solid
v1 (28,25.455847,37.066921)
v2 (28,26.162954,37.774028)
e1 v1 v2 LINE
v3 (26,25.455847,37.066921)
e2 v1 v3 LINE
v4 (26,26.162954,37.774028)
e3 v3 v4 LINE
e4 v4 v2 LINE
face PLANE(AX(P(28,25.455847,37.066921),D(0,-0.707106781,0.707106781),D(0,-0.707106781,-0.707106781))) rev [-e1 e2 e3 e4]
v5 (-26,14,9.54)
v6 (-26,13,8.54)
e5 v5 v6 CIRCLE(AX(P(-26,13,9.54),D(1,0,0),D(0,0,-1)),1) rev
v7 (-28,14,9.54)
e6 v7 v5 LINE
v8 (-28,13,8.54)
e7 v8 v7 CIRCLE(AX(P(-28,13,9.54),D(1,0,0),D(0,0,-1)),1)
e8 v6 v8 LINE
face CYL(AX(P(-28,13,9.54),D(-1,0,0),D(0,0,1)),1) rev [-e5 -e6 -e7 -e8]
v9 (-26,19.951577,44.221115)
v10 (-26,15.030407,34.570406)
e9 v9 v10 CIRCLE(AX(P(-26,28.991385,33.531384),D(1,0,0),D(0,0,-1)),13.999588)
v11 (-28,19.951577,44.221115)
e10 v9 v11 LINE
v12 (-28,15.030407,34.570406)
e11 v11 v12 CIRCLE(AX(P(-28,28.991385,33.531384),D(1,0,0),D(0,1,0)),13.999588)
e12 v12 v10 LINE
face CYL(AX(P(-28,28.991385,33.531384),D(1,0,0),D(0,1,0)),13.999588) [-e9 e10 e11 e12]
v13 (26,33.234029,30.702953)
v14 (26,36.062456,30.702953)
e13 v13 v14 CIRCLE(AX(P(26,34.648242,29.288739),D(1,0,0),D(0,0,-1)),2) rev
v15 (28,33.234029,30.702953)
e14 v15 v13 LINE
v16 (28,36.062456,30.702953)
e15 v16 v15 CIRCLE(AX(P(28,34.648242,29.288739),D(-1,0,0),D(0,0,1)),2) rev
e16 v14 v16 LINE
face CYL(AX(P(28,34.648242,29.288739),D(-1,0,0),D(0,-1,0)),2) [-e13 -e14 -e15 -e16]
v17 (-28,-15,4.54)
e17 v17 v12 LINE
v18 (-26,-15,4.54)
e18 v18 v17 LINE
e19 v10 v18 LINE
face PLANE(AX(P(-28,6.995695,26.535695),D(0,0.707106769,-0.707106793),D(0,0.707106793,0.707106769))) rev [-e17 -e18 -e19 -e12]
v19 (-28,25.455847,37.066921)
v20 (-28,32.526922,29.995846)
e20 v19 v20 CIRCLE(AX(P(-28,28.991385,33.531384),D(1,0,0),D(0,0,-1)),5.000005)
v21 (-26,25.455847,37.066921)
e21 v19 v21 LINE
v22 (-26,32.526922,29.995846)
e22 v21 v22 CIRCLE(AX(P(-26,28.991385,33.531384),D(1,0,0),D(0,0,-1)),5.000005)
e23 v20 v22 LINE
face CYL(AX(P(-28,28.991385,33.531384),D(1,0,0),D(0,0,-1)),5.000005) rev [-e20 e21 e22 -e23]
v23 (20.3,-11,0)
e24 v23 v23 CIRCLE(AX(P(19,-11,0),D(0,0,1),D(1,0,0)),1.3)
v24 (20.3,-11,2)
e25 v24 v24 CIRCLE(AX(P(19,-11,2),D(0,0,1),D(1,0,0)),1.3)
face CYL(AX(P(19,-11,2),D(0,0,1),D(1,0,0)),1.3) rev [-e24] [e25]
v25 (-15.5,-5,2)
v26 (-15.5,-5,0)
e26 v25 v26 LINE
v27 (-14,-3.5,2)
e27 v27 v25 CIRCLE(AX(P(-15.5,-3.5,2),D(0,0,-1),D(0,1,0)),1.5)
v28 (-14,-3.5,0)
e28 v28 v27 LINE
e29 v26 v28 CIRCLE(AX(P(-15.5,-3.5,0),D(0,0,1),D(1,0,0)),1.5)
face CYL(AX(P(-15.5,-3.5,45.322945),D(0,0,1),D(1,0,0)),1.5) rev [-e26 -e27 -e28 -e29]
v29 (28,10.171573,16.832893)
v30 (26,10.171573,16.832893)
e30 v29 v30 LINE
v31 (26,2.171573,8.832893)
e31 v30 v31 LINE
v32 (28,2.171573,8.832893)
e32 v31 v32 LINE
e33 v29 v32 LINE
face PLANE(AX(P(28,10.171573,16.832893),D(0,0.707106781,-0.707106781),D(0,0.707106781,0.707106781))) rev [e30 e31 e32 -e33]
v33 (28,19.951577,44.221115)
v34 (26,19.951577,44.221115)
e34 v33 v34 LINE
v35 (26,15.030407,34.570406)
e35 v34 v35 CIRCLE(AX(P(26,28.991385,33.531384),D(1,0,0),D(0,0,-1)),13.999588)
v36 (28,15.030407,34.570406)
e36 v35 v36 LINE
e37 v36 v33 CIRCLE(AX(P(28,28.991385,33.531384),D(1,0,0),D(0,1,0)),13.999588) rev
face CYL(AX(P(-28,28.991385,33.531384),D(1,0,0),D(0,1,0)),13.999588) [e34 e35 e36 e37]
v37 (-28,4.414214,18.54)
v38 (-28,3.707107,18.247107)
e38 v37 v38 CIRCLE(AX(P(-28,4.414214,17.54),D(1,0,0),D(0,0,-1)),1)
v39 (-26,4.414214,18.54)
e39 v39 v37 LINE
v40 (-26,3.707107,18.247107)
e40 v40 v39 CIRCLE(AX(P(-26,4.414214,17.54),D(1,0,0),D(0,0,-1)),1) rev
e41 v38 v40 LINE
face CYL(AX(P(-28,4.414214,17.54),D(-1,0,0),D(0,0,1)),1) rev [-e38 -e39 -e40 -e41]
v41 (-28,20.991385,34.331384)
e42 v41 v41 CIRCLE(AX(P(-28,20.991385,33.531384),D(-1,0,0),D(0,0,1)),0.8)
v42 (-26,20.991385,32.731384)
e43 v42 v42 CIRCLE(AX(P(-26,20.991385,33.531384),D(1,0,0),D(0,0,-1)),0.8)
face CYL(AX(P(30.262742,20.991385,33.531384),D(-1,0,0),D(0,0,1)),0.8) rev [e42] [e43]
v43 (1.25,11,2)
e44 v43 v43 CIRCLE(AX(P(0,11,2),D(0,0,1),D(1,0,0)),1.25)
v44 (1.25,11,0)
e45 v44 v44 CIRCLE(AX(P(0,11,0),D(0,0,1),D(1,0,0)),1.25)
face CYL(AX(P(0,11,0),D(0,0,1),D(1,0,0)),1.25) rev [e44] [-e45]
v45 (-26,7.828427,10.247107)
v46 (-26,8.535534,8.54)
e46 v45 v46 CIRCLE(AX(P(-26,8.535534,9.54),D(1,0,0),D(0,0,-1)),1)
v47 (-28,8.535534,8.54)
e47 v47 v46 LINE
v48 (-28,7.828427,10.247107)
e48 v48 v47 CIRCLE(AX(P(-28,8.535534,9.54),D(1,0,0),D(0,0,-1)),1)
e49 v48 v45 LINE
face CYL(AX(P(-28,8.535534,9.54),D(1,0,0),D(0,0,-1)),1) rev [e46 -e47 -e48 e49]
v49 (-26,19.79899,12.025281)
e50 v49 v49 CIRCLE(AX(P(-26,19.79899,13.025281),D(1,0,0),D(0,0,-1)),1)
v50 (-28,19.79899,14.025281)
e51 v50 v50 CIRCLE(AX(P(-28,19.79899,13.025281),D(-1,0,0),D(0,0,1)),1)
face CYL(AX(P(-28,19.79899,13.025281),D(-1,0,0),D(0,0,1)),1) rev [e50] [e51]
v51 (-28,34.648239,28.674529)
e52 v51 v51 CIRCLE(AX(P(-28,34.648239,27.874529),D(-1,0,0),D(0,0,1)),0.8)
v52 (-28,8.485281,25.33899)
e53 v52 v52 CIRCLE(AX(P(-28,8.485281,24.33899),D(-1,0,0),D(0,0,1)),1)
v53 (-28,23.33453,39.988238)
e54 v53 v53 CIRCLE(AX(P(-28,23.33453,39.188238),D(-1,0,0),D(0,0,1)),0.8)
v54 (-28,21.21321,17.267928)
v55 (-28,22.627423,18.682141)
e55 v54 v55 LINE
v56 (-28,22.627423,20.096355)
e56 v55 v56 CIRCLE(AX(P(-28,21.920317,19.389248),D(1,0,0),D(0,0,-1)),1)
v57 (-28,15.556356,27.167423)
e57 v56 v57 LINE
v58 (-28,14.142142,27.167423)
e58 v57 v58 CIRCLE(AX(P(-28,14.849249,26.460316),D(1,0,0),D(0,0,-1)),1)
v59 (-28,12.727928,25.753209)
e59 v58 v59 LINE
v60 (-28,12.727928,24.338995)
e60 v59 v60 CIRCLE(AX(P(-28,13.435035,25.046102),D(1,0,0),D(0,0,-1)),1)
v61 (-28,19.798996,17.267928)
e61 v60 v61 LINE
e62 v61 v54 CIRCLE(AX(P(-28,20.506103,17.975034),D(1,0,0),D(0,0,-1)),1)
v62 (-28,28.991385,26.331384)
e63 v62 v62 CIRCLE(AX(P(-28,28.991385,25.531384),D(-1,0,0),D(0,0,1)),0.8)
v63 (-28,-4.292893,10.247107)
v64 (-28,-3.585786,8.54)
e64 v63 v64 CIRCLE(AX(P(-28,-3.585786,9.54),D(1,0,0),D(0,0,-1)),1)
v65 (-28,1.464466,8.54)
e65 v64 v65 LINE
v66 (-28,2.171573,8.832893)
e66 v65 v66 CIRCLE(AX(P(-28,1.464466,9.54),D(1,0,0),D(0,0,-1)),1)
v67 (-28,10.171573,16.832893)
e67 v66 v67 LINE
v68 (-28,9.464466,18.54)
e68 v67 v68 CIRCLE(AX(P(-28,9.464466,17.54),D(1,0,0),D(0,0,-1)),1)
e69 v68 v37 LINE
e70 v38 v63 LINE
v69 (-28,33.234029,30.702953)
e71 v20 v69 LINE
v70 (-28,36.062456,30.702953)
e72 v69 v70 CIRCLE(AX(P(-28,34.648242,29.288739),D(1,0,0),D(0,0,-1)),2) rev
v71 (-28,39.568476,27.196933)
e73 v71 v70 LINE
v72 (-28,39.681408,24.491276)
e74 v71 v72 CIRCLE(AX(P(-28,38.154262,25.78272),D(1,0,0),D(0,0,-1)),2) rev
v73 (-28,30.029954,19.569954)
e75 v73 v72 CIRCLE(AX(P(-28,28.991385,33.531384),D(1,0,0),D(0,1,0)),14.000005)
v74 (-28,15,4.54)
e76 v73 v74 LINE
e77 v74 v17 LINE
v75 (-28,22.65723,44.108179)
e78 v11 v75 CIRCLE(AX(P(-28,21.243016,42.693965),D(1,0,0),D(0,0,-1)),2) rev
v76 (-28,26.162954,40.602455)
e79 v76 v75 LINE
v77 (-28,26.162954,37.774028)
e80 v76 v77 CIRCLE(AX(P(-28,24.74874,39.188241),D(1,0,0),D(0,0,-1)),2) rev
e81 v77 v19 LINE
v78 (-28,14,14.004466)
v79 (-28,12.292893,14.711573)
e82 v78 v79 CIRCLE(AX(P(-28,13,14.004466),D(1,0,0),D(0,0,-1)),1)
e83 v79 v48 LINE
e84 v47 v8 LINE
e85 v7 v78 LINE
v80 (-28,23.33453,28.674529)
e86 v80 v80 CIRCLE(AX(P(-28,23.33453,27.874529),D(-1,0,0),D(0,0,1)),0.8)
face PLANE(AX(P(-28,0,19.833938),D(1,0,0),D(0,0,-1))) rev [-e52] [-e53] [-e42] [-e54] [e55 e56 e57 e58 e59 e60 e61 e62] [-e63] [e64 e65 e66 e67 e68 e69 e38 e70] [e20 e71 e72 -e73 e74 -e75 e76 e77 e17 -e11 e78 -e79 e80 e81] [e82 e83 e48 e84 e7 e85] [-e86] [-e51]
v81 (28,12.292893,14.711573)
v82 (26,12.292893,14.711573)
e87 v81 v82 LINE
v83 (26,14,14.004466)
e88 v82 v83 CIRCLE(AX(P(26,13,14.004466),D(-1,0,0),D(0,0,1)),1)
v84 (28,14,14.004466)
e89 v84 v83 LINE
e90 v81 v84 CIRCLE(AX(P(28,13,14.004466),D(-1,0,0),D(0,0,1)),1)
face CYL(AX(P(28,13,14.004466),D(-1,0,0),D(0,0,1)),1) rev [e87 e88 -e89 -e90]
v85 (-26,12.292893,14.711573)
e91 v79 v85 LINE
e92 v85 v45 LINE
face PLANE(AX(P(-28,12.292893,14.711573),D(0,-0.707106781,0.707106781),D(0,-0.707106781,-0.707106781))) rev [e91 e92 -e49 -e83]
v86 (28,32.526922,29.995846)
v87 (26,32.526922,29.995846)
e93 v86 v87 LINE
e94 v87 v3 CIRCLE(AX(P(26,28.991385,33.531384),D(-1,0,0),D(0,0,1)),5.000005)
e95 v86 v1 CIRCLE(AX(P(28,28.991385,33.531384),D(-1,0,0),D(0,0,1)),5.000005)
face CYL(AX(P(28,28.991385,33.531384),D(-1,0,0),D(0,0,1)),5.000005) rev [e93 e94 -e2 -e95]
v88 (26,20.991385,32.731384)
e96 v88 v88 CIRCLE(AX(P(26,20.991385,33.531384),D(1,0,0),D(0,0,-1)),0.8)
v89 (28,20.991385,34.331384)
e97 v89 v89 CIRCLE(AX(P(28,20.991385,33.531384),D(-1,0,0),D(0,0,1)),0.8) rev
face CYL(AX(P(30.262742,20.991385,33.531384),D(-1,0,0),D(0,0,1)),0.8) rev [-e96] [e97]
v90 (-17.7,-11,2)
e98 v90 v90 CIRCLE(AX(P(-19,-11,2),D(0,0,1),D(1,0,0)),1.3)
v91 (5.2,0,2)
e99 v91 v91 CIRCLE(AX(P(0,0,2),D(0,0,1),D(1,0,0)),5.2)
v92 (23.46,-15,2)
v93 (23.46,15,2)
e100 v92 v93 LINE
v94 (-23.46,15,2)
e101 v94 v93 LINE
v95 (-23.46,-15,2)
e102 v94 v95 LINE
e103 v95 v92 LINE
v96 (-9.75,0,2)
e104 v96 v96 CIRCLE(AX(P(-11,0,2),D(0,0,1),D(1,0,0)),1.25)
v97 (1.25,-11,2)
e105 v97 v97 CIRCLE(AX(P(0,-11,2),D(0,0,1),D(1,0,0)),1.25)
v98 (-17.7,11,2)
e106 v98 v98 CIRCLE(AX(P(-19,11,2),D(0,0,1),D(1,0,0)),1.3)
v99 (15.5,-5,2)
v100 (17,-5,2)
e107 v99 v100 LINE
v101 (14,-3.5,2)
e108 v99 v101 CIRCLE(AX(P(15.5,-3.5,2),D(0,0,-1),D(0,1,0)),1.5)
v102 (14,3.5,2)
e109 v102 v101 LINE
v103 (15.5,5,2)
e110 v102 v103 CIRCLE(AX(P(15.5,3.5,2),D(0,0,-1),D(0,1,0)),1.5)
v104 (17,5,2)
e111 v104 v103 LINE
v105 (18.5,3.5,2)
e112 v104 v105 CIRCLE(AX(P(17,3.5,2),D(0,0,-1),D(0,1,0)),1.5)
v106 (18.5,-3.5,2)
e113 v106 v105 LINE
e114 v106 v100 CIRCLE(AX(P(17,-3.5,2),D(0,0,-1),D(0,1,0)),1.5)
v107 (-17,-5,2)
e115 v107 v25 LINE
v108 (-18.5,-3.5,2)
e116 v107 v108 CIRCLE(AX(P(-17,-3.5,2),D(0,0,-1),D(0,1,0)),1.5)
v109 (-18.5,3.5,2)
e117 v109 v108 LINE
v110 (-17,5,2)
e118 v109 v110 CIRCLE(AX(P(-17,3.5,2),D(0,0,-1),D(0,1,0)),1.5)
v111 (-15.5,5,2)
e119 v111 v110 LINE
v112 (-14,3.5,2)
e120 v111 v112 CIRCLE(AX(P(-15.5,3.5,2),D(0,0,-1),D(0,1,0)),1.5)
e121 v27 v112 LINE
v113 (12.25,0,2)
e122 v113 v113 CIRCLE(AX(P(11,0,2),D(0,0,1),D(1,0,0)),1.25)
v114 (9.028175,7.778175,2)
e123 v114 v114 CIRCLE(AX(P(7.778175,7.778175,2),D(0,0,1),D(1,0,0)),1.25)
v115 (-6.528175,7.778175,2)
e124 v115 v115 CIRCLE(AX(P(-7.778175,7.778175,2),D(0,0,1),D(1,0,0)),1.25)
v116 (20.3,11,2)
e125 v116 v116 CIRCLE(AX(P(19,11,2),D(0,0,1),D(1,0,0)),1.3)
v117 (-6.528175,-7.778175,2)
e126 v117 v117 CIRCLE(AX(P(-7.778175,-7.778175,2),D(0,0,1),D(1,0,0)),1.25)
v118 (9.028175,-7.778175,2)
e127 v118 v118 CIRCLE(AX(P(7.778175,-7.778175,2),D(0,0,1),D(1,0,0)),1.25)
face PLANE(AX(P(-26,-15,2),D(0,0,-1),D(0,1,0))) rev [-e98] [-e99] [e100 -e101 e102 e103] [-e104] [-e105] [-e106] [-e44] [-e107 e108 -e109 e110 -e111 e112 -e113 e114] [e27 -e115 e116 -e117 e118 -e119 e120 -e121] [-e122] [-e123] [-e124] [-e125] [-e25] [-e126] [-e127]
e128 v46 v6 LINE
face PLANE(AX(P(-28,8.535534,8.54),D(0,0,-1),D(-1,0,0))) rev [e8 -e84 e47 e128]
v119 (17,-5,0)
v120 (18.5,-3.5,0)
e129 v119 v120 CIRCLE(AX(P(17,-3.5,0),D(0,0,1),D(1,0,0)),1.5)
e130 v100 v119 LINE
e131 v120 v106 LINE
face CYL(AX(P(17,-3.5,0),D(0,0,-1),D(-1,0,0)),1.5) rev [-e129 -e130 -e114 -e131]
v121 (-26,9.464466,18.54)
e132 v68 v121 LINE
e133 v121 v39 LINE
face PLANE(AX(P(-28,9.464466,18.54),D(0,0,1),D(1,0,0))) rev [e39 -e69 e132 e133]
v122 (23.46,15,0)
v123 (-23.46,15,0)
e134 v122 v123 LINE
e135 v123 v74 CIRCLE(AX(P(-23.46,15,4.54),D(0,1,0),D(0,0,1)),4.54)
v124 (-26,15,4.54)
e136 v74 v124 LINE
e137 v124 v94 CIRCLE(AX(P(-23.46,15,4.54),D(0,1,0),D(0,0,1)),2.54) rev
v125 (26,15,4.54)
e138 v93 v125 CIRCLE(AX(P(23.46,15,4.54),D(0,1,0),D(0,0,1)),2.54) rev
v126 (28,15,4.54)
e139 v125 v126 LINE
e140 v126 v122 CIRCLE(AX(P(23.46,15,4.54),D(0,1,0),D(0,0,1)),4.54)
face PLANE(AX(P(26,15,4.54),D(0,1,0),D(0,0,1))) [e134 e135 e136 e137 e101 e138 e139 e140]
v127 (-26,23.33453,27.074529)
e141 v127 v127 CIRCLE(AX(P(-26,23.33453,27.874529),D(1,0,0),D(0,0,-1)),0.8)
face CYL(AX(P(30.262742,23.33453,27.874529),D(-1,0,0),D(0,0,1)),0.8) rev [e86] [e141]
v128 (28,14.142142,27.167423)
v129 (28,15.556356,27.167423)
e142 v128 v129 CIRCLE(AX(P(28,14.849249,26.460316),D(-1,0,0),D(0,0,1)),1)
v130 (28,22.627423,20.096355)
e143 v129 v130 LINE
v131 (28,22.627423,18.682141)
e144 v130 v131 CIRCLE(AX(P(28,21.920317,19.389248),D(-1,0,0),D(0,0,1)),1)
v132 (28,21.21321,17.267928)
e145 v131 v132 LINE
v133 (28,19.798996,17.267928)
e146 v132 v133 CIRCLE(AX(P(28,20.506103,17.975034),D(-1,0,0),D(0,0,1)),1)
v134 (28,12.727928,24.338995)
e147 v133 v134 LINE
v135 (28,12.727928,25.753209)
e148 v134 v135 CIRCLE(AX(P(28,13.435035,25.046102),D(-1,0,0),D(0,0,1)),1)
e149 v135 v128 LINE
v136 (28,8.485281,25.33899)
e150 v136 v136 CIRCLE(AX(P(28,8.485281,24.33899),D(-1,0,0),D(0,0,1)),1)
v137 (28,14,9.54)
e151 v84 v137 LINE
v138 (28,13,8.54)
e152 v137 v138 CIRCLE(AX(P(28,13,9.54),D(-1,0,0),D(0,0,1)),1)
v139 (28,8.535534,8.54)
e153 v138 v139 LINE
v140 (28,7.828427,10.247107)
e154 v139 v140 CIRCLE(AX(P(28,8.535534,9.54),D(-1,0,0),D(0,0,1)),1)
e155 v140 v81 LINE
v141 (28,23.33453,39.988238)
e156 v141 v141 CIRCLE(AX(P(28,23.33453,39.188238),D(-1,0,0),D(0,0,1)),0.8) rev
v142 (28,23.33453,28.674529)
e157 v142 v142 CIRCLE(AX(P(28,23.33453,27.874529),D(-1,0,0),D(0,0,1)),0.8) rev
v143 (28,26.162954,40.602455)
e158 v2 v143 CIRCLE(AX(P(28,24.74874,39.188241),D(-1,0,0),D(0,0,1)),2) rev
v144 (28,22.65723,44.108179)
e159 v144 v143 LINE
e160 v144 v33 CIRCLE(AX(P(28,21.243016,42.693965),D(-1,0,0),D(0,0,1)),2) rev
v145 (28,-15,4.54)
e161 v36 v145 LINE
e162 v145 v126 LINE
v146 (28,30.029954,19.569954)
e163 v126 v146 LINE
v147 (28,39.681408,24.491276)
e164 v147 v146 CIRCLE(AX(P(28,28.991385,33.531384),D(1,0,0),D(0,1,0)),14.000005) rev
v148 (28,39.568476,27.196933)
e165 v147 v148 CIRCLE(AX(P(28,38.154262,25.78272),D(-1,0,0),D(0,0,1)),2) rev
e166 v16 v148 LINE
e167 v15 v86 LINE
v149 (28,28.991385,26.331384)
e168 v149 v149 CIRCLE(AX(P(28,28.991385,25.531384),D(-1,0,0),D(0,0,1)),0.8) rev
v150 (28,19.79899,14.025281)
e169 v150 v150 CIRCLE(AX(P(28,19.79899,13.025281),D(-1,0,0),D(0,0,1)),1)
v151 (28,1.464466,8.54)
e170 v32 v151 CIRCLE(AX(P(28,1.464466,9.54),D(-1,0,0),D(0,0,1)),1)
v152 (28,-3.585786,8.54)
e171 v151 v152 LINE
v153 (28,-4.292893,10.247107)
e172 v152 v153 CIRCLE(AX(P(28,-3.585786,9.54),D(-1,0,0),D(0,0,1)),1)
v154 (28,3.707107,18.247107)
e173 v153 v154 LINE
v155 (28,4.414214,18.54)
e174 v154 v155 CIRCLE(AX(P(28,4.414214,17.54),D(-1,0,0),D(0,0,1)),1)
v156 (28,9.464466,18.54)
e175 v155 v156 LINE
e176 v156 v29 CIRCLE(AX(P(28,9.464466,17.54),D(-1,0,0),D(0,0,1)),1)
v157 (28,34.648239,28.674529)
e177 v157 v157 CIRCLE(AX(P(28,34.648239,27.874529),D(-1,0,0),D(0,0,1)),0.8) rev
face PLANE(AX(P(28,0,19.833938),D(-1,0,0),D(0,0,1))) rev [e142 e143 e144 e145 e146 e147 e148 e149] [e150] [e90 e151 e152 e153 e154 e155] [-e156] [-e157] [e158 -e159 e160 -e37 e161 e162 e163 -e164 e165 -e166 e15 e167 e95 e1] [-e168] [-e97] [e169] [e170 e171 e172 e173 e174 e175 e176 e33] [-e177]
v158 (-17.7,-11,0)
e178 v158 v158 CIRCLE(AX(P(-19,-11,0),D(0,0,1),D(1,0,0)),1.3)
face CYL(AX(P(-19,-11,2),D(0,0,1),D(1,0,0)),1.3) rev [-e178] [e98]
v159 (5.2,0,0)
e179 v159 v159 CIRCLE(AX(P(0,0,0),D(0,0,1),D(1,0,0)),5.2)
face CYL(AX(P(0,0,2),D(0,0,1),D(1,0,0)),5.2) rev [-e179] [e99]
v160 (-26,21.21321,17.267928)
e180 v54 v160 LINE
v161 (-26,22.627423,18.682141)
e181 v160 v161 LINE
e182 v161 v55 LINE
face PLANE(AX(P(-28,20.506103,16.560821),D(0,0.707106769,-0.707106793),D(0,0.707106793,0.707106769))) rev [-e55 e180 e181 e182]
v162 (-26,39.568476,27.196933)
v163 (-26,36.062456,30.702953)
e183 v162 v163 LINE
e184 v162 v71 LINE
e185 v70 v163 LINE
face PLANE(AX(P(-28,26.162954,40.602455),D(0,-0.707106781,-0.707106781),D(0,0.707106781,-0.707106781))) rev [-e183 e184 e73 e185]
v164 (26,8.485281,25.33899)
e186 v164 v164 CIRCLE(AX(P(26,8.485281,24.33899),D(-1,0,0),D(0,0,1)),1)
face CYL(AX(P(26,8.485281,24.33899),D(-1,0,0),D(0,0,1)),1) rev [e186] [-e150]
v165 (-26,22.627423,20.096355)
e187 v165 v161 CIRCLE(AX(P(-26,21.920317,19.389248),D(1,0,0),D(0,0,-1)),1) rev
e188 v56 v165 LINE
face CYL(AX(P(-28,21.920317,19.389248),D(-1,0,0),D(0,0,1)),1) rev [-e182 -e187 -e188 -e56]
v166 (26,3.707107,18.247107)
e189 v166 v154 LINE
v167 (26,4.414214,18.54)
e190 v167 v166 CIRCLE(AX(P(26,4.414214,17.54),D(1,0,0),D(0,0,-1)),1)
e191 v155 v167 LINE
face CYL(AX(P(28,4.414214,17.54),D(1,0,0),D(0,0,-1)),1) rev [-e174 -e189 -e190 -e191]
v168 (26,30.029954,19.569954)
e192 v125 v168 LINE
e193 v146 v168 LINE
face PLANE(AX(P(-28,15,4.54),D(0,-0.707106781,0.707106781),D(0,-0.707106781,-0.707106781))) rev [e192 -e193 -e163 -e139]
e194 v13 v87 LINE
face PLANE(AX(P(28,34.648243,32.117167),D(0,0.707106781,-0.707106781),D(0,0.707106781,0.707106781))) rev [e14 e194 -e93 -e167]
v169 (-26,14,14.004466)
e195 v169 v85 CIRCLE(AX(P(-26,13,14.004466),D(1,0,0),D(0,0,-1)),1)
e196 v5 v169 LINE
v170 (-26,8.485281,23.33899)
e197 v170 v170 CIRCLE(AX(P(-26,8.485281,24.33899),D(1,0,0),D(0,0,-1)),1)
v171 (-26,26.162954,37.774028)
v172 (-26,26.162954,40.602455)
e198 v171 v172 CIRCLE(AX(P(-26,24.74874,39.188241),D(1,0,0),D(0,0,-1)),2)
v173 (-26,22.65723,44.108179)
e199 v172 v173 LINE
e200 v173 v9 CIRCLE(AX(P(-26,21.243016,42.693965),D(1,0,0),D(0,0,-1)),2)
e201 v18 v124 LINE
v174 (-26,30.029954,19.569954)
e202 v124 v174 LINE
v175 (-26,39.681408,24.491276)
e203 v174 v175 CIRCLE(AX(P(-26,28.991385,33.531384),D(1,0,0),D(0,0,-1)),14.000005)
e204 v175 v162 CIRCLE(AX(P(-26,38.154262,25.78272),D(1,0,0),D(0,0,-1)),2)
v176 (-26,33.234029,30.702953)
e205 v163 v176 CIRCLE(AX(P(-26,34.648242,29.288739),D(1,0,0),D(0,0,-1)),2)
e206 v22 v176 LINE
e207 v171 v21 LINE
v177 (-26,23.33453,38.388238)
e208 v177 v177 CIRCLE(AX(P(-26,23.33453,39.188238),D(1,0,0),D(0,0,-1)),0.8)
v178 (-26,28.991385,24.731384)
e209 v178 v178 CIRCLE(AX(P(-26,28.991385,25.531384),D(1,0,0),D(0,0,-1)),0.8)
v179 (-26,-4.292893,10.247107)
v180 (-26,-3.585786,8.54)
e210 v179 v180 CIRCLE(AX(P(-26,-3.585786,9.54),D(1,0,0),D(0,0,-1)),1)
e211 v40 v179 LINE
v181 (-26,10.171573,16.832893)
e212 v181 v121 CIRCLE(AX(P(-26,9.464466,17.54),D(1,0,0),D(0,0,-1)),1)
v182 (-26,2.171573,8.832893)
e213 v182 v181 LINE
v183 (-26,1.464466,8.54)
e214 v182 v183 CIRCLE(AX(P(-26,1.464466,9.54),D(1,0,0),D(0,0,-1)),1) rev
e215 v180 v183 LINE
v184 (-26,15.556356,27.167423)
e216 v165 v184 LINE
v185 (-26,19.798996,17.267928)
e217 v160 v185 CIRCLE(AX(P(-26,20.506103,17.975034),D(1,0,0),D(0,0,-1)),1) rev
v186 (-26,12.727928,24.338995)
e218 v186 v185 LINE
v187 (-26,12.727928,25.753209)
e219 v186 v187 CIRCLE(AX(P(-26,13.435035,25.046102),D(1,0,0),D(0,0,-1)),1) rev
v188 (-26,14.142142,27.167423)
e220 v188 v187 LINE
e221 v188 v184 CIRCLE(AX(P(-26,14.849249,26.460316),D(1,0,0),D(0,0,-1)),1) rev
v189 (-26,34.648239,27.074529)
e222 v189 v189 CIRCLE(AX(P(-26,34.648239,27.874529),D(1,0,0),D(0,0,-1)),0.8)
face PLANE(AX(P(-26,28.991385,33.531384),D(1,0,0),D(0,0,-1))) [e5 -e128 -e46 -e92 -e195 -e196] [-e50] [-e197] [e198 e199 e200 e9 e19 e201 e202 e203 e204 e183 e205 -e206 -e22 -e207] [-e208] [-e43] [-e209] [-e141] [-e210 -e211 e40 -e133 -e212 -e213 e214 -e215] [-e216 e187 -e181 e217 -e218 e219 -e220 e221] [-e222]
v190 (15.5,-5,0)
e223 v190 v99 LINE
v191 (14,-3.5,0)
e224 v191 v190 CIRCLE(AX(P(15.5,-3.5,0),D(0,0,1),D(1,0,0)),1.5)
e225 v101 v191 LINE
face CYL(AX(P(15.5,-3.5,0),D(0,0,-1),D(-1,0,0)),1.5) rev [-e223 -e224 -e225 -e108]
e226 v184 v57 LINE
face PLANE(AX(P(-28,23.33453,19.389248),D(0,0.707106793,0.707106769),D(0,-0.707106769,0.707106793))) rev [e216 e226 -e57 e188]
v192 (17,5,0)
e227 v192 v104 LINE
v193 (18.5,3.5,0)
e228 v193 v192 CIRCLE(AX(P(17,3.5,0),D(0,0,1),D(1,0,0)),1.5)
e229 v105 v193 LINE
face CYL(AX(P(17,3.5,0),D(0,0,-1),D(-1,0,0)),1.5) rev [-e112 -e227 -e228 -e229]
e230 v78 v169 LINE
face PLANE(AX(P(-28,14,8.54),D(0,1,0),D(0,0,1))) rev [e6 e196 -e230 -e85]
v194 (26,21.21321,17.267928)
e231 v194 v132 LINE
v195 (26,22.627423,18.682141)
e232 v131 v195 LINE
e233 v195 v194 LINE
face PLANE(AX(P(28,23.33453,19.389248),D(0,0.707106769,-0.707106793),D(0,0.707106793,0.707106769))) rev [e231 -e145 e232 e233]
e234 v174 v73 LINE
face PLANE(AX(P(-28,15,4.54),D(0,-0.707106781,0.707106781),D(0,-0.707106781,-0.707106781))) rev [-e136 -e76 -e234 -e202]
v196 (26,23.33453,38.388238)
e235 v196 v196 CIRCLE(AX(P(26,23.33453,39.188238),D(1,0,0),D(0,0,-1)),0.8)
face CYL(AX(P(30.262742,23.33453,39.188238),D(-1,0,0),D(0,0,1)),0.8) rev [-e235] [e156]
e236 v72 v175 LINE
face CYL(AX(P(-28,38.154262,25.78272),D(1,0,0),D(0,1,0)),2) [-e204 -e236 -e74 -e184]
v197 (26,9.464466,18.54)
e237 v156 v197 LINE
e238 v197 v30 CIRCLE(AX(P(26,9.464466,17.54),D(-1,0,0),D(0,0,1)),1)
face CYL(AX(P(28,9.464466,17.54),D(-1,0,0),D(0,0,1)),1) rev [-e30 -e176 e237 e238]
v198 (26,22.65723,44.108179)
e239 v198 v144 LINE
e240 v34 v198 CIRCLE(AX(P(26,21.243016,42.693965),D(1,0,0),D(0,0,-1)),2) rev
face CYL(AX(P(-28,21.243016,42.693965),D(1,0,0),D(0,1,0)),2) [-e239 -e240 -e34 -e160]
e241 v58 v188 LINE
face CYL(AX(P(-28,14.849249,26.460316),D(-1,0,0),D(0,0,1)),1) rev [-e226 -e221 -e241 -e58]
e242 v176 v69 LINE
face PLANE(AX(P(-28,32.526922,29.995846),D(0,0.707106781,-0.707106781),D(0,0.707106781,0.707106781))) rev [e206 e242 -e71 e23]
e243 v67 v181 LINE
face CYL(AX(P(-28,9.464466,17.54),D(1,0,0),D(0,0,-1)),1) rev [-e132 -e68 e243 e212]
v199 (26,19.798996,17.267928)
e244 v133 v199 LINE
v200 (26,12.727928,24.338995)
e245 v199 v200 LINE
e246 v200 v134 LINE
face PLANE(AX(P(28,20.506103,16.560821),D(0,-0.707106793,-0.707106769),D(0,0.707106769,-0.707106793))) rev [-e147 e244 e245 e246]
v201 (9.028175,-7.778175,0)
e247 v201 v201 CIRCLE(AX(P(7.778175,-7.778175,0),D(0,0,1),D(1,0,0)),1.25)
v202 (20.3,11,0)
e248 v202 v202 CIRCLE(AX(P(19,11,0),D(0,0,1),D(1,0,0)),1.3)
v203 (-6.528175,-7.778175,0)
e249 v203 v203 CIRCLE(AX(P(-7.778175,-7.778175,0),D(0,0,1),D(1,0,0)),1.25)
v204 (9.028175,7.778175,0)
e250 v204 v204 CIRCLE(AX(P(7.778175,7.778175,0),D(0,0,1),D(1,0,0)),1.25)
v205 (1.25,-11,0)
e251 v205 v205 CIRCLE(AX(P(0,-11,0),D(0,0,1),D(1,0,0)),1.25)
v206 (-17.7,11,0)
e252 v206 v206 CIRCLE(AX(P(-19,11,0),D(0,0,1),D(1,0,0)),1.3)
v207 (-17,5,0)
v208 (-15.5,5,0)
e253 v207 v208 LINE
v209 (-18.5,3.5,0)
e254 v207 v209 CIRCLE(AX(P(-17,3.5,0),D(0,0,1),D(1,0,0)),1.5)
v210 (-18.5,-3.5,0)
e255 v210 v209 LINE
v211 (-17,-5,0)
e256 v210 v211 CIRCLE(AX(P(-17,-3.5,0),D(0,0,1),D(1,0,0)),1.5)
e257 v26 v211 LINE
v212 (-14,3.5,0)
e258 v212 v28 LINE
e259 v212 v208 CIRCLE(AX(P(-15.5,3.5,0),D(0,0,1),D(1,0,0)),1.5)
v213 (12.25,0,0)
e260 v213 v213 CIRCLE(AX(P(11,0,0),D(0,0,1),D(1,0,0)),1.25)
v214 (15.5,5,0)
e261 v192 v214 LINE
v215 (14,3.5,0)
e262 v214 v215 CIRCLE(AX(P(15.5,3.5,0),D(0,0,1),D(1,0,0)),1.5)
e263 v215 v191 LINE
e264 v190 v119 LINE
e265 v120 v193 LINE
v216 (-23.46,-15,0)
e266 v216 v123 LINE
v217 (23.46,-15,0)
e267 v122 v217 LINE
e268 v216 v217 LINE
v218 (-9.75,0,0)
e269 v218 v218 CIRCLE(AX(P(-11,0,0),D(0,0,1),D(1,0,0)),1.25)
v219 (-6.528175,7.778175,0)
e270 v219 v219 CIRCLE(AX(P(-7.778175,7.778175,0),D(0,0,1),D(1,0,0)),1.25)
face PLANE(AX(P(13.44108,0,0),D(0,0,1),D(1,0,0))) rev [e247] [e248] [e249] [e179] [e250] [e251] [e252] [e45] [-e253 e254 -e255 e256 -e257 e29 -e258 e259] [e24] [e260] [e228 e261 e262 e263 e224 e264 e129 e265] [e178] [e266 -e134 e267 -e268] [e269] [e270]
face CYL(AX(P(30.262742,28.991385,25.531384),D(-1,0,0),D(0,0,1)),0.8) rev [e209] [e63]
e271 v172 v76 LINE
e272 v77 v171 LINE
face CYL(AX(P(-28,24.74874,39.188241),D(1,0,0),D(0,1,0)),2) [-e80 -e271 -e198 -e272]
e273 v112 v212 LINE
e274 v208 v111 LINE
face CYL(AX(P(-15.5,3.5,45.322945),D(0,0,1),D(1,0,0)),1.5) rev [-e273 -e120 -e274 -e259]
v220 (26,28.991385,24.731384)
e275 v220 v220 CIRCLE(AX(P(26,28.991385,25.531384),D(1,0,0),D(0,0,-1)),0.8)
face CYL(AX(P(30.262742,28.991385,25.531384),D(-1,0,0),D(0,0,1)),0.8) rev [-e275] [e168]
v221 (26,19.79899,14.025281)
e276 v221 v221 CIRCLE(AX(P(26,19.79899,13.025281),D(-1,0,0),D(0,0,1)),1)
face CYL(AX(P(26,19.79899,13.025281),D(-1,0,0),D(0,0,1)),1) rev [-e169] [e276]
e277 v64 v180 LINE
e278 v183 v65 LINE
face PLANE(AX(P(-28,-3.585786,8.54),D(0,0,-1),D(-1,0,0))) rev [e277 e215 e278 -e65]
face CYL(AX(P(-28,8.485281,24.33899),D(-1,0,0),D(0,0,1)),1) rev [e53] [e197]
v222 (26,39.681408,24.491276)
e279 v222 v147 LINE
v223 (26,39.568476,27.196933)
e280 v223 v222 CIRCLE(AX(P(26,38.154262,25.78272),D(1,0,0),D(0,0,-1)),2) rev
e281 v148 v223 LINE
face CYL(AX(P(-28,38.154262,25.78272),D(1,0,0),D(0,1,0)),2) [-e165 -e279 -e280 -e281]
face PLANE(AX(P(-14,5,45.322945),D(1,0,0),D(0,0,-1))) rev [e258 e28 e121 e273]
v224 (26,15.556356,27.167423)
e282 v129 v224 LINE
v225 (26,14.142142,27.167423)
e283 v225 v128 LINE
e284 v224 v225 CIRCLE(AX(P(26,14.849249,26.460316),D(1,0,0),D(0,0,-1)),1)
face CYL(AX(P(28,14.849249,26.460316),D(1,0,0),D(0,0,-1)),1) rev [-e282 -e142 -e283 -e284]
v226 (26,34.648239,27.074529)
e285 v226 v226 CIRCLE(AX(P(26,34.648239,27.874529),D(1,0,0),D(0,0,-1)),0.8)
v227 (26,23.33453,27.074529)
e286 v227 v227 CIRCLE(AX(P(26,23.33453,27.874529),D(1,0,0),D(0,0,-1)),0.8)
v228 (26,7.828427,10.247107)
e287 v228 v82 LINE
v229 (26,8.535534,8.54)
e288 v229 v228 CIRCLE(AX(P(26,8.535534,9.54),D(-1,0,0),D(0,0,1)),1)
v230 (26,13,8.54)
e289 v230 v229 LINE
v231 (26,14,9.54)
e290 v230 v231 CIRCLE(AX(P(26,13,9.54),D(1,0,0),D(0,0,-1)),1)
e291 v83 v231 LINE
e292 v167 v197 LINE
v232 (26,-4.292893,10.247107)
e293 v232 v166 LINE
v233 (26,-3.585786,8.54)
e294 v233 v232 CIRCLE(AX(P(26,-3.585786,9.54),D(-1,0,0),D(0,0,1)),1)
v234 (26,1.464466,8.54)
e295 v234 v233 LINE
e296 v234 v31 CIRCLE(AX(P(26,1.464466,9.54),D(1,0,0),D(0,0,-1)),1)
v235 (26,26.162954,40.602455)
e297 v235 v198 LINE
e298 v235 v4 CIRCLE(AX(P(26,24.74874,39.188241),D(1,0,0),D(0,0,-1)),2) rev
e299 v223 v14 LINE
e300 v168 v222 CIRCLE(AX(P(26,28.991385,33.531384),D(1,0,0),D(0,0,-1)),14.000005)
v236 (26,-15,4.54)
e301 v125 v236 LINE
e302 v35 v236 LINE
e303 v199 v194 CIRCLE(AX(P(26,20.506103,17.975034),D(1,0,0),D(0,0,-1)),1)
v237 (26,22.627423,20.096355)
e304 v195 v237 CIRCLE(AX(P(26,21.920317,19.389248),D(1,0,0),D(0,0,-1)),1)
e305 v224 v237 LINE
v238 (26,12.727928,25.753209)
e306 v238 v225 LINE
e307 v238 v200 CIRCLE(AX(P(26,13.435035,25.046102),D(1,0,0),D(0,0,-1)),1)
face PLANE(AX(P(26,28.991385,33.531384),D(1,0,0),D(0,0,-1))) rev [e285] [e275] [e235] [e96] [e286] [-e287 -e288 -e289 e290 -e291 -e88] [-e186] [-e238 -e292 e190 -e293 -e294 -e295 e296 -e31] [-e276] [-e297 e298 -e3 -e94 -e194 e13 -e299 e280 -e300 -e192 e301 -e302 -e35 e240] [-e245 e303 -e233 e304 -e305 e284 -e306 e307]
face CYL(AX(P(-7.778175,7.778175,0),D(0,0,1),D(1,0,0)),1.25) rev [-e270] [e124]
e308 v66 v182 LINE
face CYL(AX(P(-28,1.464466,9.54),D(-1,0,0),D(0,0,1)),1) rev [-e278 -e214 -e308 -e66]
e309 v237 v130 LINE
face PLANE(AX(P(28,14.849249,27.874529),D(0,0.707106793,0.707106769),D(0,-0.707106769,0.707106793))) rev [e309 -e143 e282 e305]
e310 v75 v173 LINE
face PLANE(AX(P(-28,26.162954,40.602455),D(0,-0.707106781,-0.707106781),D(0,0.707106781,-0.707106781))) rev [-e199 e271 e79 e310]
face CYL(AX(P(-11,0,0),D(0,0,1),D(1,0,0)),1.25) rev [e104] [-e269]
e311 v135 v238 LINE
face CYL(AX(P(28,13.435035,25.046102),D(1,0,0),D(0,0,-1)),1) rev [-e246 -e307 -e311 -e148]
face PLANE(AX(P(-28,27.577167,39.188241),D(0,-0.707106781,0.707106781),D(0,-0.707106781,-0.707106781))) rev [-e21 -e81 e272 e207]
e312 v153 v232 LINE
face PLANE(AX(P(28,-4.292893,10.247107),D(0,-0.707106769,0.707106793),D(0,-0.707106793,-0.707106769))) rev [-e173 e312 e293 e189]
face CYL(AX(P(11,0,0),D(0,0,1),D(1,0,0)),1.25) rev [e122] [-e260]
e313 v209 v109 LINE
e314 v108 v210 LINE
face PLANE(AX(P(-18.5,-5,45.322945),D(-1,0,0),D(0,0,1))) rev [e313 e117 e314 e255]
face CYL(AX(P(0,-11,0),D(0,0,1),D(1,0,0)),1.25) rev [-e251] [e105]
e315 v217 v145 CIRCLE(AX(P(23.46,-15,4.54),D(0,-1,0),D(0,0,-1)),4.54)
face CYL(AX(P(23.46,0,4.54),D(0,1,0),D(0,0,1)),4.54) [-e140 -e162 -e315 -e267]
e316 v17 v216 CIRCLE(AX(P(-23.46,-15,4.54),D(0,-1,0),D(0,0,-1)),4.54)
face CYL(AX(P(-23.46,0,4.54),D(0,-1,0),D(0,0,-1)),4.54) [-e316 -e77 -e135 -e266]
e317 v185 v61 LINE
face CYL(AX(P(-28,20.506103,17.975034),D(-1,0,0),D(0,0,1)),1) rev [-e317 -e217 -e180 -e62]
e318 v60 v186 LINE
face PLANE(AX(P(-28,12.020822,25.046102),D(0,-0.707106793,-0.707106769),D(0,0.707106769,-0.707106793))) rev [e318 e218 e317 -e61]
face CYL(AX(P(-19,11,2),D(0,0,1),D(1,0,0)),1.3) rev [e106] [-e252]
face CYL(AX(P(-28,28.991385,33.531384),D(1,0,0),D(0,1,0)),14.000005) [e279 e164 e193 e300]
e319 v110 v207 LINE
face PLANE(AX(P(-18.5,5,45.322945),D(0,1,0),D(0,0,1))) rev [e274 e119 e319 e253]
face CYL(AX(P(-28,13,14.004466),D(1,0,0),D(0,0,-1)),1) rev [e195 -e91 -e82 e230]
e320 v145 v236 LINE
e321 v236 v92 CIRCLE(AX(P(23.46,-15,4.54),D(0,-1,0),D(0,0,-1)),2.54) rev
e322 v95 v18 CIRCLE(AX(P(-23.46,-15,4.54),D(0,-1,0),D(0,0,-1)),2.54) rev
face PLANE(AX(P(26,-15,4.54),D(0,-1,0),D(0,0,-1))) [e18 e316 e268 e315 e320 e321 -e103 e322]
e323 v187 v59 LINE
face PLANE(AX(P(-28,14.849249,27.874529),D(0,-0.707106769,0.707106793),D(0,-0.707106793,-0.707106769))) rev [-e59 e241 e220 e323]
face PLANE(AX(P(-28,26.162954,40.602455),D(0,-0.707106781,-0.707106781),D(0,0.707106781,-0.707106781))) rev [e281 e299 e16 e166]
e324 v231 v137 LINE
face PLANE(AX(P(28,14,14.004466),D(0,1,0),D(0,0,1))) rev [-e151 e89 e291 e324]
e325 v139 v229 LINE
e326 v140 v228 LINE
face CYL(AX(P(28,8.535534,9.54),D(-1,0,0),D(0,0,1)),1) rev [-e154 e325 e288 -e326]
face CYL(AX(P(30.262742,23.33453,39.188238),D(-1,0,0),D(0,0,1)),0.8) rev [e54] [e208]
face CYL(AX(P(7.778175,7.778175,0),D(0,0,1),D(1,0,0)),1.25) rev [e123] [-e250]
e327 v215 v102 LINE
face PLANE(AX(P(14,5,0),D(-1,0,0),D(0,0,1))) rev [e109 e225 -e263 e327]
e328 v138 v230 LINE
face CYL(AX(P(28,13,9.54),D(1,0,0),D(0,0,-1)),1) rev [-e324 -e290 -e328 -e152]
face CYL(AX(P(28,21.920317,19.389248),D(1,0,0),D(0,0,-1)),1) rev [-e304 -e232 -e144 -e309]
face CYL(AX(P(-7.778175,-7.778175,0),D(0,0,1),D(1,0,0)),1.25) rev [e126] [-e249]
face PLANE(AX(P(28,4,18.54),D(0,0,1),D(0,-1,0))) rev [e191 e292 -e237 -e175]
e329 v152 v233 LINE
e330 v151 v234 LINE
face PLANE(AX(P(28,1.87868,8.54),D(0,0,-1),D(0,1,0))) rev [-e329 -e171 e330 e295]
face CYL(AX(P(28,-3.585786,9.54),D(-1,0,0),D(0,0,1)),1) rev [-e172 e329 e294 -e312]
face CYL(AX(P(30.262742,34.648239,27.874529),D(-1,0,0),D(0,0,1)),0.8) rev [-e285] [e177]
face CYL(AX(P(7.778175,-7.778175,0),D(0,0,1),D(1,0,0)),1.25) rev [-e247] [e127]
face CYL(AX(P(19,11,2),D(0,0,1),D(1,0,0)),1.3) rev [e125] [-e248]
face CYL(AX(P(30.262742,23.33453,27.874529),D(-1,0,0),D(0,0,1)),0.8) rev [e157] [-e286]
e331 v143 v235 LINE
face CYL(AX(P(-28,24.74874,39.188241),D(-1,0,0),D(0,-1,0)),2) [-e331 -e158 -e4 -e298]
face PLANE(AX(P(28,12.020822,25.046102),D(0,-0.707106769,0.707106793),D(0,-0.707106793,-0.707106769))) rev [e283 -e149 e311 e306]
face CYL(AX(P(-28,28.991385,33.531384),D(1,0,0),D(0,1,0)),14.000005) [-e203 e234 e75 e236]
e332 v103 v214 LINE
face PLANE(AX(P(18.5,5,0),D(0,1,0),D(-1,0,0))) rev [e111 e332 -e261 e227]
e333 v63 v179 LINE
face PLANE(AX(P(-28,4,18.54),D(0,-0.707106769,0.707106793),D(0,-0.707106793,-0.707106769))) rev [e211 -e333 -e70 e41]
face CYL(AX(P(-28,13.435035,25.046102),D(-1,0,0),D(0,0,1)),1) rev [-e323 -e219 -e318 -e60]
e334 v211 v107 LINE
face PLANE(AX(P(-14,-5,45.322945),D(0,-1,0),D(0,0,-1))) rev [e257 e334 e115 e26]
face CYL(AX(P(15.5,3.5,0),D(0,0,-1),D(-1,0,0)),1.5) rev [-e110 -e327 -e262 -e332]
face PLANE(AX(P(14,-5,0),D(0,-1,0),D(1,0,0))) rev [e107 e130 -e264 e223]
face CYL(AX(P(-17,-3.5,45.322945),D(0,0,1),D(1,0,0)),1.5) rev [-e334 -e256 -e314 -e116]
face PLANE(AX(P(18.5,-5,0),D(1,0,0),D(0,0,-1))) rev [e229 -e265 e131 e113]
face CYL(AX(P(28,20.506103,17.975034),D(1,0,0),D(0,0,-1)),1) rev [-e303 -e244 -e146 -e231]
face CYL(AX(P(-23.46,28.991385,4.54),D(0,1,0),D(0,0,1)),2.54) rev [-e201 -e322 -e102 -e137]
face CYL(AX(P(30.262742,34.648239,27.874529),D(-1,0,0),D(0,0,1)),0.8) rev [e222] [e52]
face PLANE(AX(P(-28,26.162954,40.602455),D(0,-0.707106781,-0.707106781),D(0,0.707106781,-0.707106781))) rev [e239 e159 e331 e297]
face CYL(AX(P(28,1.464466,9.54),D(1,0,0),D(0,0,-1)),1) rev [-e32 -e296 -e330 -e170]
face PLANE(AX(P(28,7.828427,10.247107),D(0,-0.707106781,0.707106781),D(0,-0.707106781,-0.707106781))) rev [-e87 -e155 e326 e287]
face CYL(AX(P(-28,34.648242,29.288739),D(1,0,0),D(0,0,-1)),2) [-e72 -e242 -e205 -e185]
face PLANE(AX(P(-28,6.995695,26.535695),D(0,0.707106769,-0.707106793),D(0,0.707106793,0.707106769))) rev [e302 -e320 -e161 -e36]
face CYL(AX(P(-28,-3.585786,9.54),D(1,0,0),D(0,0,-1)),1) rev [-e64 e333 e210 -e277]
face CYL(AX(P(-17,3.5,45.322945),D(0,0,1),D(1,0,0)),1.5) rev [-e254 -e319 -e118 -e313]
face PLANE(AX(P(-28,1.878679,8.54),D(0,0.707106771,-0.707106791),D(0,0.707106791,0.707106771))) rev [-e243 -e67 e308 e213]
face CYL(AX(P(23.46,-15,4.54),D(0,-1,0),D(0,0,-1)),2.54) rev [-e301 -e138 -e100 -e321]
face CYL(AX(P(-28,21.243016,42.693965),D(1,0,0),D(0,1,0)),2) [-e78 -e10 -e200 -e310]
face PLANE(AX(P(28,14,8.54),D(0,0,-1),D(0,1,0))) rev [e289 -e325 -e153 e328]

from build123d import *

# Parameters (mm, degrees)
KES_EKSTR_ZYON1_START          = -54
KES_EKSTR_ZYON1_OUTLINE_W      = 2
KES_EKSTR_ZYON1_OUTLINE_H      = 30
KES_EKSTR_ZYON1_DEPTH          = 56
KES_EKSTR_ZYON1_2_DEPTH        = 2
KES_EKSTR_ZYON1_3_DEPTH        = 2
KES_EKSTR_ZYON2_DEPTH          = 82.444892691
KES_EKSTR_ZYON3_DEPTH          = 82.444892691
KES_EKSTR_ZYON4_REACH          = 69.092
IZIM4_W                        = 4.5
IZIM4_H                        = 10
KES_EKSTR_ZYON5_DEPTH          = 82.444892691
KES_EKSTR_ZYON6_DEPTH          = 82.444892691
KES_EKSTR_ZYON7_DEPTH          = 82.444892691
KES_EKSTR_ZYON8_DEPTH          = 82.444892691
KES_EKSTR_ZYON9_DEPTH          = 82.444892691
KES_EKSTR_ZYON10_DEPTH         = 82.444892691
IZIM11_W                       = 4.5
IZIM11_H                       = 10
KES_EKSTR_ZYON11_DEPTH         = 66.75699783
DELIK1_D                       = 2.6
DELIK2_D                       = 10.4
F_0_2_0_2_DIAMETER_HOLE1_D     = 2
F_0_2_0_2_DIAMETER_HOLE1_DEPTH = 2
F_0_2_0_2_DIAMETER_HOLE2_D     = 2
RADYUS1_R                      = 1
RADYUS2_R                      = 1.5
RADYUS3_R                      = 2
RADYUS4_R                      = 2.54
RADYUS5_R                      = 4.54
IZIM24_R                       = 13.505605706
IZIM24_R_2                     = 7.578470051
Y_KSEKLIK_EKSTR_ZYON1_DEPTH    = 2
IZIM25_R                       = 1.25
KES_EKSTR_ZYON12_DEPTH         = 2
KES_EKSTR_ZYON13_REACH         = 84.134
IZIM27_R                       = 0.8


with BuildPart() as part:
    # Kes-Ekstrüzyon1: read off the stored shape, not the designer's step
    # Kes-Ekstrüzyon1 outline → Kes-Ekstrüzyon1 (new body)
    with BuildSketch(Plane(origin=(26, 0, 0), x_dir=(0, 0, -1), z_dir=(1, 0, 0)).offset(KES_EKSTR_ZYON1_START)):
        with Locations((-1, 0)):
            Rectangle(KES_EKSTR_ZYON1_OUTLINE_W, KES_EKSTR_ZYON1_OUTLINE_H)
    extrude(amount=KES_EKSTR_ZYON1_DEPTH)

    # Kes-Ekstr_zyon1 2 outline → Kes-Ekstr_zyon1 2 (add)
    with BuildSketch(Plane(origin=(26, 0, 0), x_dir=(0, 0, -1), z_dir=(1, 0, 0)).offset(KES_EKSTR_ZYON1_START)):
        with BuildLine():
            Line((-4.54, 15), (-19.569954037, 30.029954037))
            ThreePointArc((-19.569954037, 30.029954037), (-21.507688424, 36.162918334), (-25.983160829, 40.78224863))
            Line((-25.983160829, 40.78224863), (-45.321945481, 21.443463382))
            ThreePointArc((-45.321945481, 21.443463382), (-40.702951136, 16.968195195), (-34.570405924, 15.030406939))
            Line((-34.570405924, 15.030406939), (-4.54, -15))
            Line((-4.54, -15), (-2, -15))
            Line((-2, -15), (-2, 15))
            Line((-2, 15), (-4.54, 15))
        make_face()
    extrude(amount=KES_EKSTR_ZYON1_2_DEPTH)

    # Kes-Ekstr_zyon1 3 outline → Kes-Ekstr_zyon1 3 (add)
    with BuildSketch(Plane(origin=(26, 0, 0), x_dir=(0, 0, -1), z_dir=(1, 0, 0))):
        with BuildLine():
            Line((-4.54, 15), (-19.569954037, 30.029954037))
            ThreePointArc((-19.569954037, 30.029954037), (-21.507688424, 36.162918334), (-25.983160829, 40.78224863))
            Line((-25.983160829, 40.78224863), (-45.321945481, 21.443463382))
            ThreePointArc((-45.321945481, 21.443463382), (-40.702951136, 16.968195195), (-34.570405924, 15.030406939))
            Line((-34.570405924, 15.030406939), (-4.54, -15))
            Line((-4.54, -15), (-2, -15))
            Line((-2, -15), (-2, 15))
            Line((-2, 15), (-4.54, 15))
        make_face()
    extrude(amount=KES_EKSTR_ZYON1_3_DEPTH)

    # Çizim2 → Kes-Ekstrüzyon2 (cut, through all)
    with BuildSketch(Plane.ZY.offset(-26)):
        with BuildLine():
            Line((39.188241686, 27.577167772), (32.117166758, 34.648242701))
            Line((32.117166758, 34.648242701), (29.995846117, 32.52692206))
            ThreePointArc((29.995846117, 32.52692206), (29.995846117, 25.455847131), (37.066921045, 25.455847131))
            Line((37.066921045, 25.455847131), (39.188241686, 27.577167772))
        make_face()
    extrude(amount=-KES_EKSTR_ZYON2_DEPTH, mode=Mode.SUBTRACT)

    # Çizim3 → Kes-Ekstrüzyon3 (cut, through all)
    with BuildSketch(Plane(origin=(-26, 0, 0), x_dir=(0, 0, -1), z_dir=(1, 0, 0))):
        with BuildLine():
            Line((-32.11716646, 34.648242403), (-39.188241389, 27.577167475))
            Line((-39.188241389, 27.577167475), (-37.066921045, 25.455847131))
            ThreePointArc((-37.066921045, 25.455847131), (-29.995846117, 25.455847131), (-29.995846117, 32.52692206))
            Line((-29.995846117, 32.52692206), (-32.11716646, 34.648242403))
        make_face()
    extrude(amount=-KES_EKSTR_ZYON3_DEPTH, mode=Mode.SUBTRACT)

    # Çizim4 → Kes-Ekstrüzyon4 (cut, up to next)
    with BuildSketch(Plane(origin=(0, 0, 0), x_dir=(-1, 0, 0), z_dir=(0, 0, -1)), mode=Mode.PRIVATE) as kes_ekstr_zyon4_sk1:
        with Locations((16.25, 0)):
            Rectangle(IZIM4_W, IZIM4_H)
    kes_ekstr_zyon4_tool1 = extrude(kes_ekstr_zyon4_sk1.sketch, amount=-KES_EKSTR_ZYON4_REACH, mode=Mode.PRIVATE) & part.part
    add(kes_ekstr_zyon4_tool1.solids().sort_by_distance((-16.25, 0, 0))[0], mode=Mode.SUBTRACT)

    # Çizim5 → Kes-Ekstrüzyon5 (cut, through all)
    with BuildSketch(Plane.ZY.offset(-26)):
        with BuildLine():
            Line((10.247106781, 7.828427125), (14.711572875, 12.292893219))
            ThreePointArc((14.711572875, 12.292893219), (14.928345627, 13.382683432), (14.004466094, 14))
            Line((14.004466094, 14), (8.54, 14))
            Line((8.54, 14), (8.54, 8.535533906))
            ThreePointArc((8.54, 8.535533906), (9.157316568, 7.611654373), (10.247106781, 7.828427125))
        make_face()
    extrude(amount=-KES_EKSTR_ZYON5_DEPTH, mode=Mode.SUBTRACT)

    # Çizim6 → Kes-Ekstrüzyon6 (cut, through all)
    with BuildSketch(Plane.ZY.offset(-26)):
        Polygon((27.874529335, 14.849248859), (19.389247817, 23.334530089), (16.56082074, 20.506102917), (25.046102258, 12.020821686), align=None)
    extrude(amount=-KES_EKSTR_ZYON6_DEPTH, mode=Mode.SUBTRACT)

    # Çizim7 → Kes-Ekstrüzyon7 (cut, through all)
    with BuildSketch(Plane.ZY.offset(-26)):
        with BuildLine():
            Line((16.832893122, 10.171572778), (8.54, 1.878679656))
            Line((8.54, 1.878679656), (8.54, -3.585786438))
            ThreePointArc((8.54, -3.585786438), (9.157316575, -4.509665973), (10.247106793, -4.292893207))
            Line((10.247106793, -4.292893207), (18.539999854, 4.000000134))
            Line((18.539999854, 4.000000134), (18.539999854, 9.464466017))
            ThreePointArc((18.539999854, 9.464466017), (17.922683304, 10.388345523), (16.832893122, 10.171572778))
        make_face()
    extrude(amount=-KES_EKSTR_ZYON7_DEPTH, mode=Mode.SUBTRACT)

    # Çizim8 → Kes-Ekstrüzyon8 (cut, through all)
    with BuildSketch(Plane(origin=(-26, 0, 0), x_dir=(0, 0, -1), z_dir=(1, 0, 0))):
        with BuildLine():
            Line((-8.54, 8.535533906), (-8.54, 14))
            Line((-8.54, 14), (-14.004466094, 14))
            ThreePointArc((-14.004466094, 14), (-14.928345627, 13.382683432), (-14.711572875, 12.292893219))
            Line((-14.711572875, 12.292893219), (-10.247106781, 7.828427125))
            ThreePointArc((-10.247106781, 7.828427125), (-9.157316568, 7.611654373), (-8.54, 8.535533906))
        make_face()
    extrude(amount=-KES_EKSTR_ZYON8_DEPTH, mode=Mode.SUBTRACT)

    # Çizim9 → Kes-Ekstrüzyon9 (cut, through all)
    with BuildSketch(Plane(origin=(-26, 0, 0), x_dir=(0, 0, -1), z_dir=(1, 0, 0))):
        Polygon((-19.389247817, 23.334530089), (-27.874529335, 14.849248859), (-25.046102258, 12.020821686), (-16.56082074, 20.506102917), align=None)
    extrude(amount=-KES_EKSTR_ZYON9_DEPTH, mode=Mode.SUBTRACT)

    # Çizim10 → Kes-Ekstrüzyon10 (cut, through all)
    with BuildSketch(Plane(origin=(-26, 0, 0), x_dir=(0, 0, -1), z_dir=(1, 0, 0))):
        with BuildLine():
            Line((-18.539999854, 9.46446608), (-18.539999854, 4.000000134))
            Line((-18.539999854, 4.000000134), (-10.247106757, -4.292893243))
            ThreePointArc((-10.247106757, -4.292893243), (-9.157316576, -4.509666002), (-8.540000021, -3.585786497))
            Line((-8.540000021, -3.585786497), (-8.540000021, 1.878679489))
            Line((-8.540000021, 1.878679489), (-16.83289312, 10.171572827))
            ThreePointArc((-16.83289312, 10.171572827), (-17.9226833, 10.388345584), (-18.539999854, 9.46446608))
        make_face()
    extrude(amount=-KES_EKSTR_ZYON10_DEPTH, mode=Mode.SUBTRACT)

    # Çizim11 → Kes-Ekstrüzyon11 (cut, through all)
    with BuildSketch(Plane.XY.offset(2)):
        with Locations((16.25, 0)):
            Rectangle(IZIM11_W, IZIM11_H)
    extrude(amount=-KES_EKSTR_ZYON11_DEPTH, mode=Mode.SUBTRACT)

    # Delik1 (through all)
    with Locations(Plane.XY.offset(2)):
        with Locations((-19, 11), (19, 11), (-19, -11), (19, -11), (7.778174593, 7.778174593), (11, 0), (7.778174593, -7.778174593), (0, -11), (-7.778174593, -7.778174593), (-11, 0), (-7.778174593, 7.778174593), (0, 11)):
            Hole(DELIK1_D / 2)

    # Delik2 (through all)
    with Locations(Plane.XY.offset(2)):
        with Locations((0, 0)):
            Hole(DELIK2_D / 2)

    # Ø0.2 (0.2) Diameter Hole1
    with Locations(Plane.ZY.offset(28)):
        with Locations((24.338989873, 8.485281374), (13.025281374, 19.798989873)):
            Hole(F_0_2_0_2_DIAMETER_HOLE1_D / 2, depth=F_0_2_0_2_DIAMETER_HOLE1_DEPTH)

    # Ø0.2 (0.2) Diameter Hole2 (through all)
    with Locations(Plane.ZY.offset(-26)):
        with Locations((24.338989873, 8.485281374), (13.025281374, 19.798989873)):
            Hole(F_0_2_0_2_DIAMETER_HOLE2_D / 2)

    # Radyus1
    radyus1_edges = [part.edges().sort_by_distance(p)[0] for p in [
        (27, 14, 8.54),
        (27, 14.849248859, 27.874529335),
        (27, 12.020821686, 25.046102258),
        (27, 20.506102917, 16.56082074),
        (27, 23.334530089, 19.389247817),
        (27, 4.000000134, 18.539999854),
        (27, 1.878679656, 8.54),
        (-27, 14, 8.54),
        (-27, 23.334530089, 19.389247817),
        (-27, 20.506102917, 16.56082074),
        (-27, 12.020821686, 25.046102258),
        (-27, 14.849248859, 27.874529335),
        (-27, 1.878679489, 8.540000021),
        (-27, 4.000000134, 18.539999854),
    ]]
    fillet(radyus1_edges, radius=RADYUS1_R)

    # Radyus2
    radyus2_edges = [part.edges().sort_by_distance(p)[0] for p in [
        (-14, 5, 1),
        (-18.5, 5, 1),
        (-18.5, -5, 1),
        (-14, -5, 1),
        (18.5, -5, 1),
        (14, -5, 1),
        (14, 5, 1),
        (18.5, 5, 1),
    ]]
    fillet(radyus2_edges, radius=RADYUS2_R)

    # Radyus3
    radyus3_edges = [part.edges().sort_by_distance(p)[0] for p in [
        (27, 21.443463382, 45.321945481),
        (-27, 40.78224863, 25.983160829),
        (-27, 21.443463382, 45.321945481),
        (27, 40.78224863, 25.983160829),
        (27, 27.577167772, 39.188241686),
        (27, 34.648242701, 32.117166758),
        (-27, 34.648242403, 32.11716646),
        (-27, 27.577167475, 39.188241389),
    ]]
    fillet(radyus3_edges, radius=RADYUS3_R)

    # Radyus4
    radyus4_edges = [part.edges().sort_by_distance(p)[0] for p in [
        (-26, 0, 2),
        (26, 0, 2),
    ]]
    fillet(radyus4_edges, radius=RADYUS4_R)

    # Radyus5
    radyus5_edges = [part.edges().sort_by_distance(p)[0] for p in [
        (-28, 0, 0),
        (28, 0, 0),
    ]]
    fillet(radyus5_edges, radius=RADYUS5_R)

    # Çizim24 → Yükseklik-Ekstrüzyon1 (add)
    with BuildSketch(Plane.XY.offset(2)):
        Circle(IZIM24_R)
        Circle(IZIM24_R_2, mode=Mode.SUBTRACT)
    extrude(amount=-Y_KSEKLIK_EKSTR_ZYON1_DEPTH)

    # Çizim25 → Kes-Ekstrüzyon12 (cut)
    with BuildSketch(Plane.XY.offset(2)):
        with Locations((0, 11)):
            Circle(IZIM25_R)
        with Locations((7.778174593, 7.778174593)):
            Circle(IZIM25_R)
        with Locations((11, 0)):
            Circle(IZIM25_R)
        with Locations((7.778174593, -7.778174593)):
            Circle(IZIM25_R)
        with Locations((0, -11)):
            Circle(IZIM25_R)
        with Locations((-7.778174593, -7.778174593)):
            Circle(IZIM25_R)
        with Locations((-11, 0)):
            Circle(IZIM25_R)
        with Locations((-7.778174593, 7.778174593)):
            Circle(IZIM25_R)
    extrude(amount=-KES_EKSTR_ZYON12_DEPTH, mode=Mode.SUBTRACT)

    # Kes-Ekstrüzyon13: up to this face of the body (flat: up to its plane)
    kes_ekstr_zyon13_end = Plane(part.part.faces().sort_by_distance((28, 15.486105726, 21.072998549))[0])
    # Çizim27 → Kes-Ekstrüzyon13 (cut, up to the picked face)
    with BuildSketch(Plane.ZY.offset(28), mode=Mode.PRIVATE) as kes_ekstr_zyon13_sk1:
        with Locations((39.18823783, 23.334530346)):
            Circle(IZIM27_R)
    kes_ekstr_zyon13_tool1 = split(extrude(kes_ekstr_zyon13_sk1.sketch, amount=-KES_EKSTR_ZYON13_REACH, mode=Mode.PRIVATE), bisect_by=kes_ekstr_zyon13_end, keep=Keep.BOTH, mode=Mode.PRIVATE)
    # Çizim27 → Kes-Ekstrüzyon13 (cut, up to the picked face)
    with BuildSketch(Plane.ZY.offset(28), mode=Mode.PRIVATE) as kes_ekstr_zyon13_sk2:
        with Locations((33.531383581, 20.991384595)):
            Circle(IZIM27_R)
    kes_ekstr_zyon13_tool2 = split(extrude(kes_ekstr_zyon13_sk2.sketch, amount=-KES_EKSTR_ZYON13_REACH, mode=Mode.PRIVATE), bisect_by=kes_ekstr_zyon13_end, keep=Keep.BOTH, mode=Mode.PRIVATE)
    # Çizim27 → Kes-Ekstrüzyon13 (cut, up to the picked face)
    with BuildSketch(Plane.ZY.offset(28), mode=Mode.PRIVATE) as kes_ekstr_zyon13_sk3:
        with Locations((27.874529331, 23.334530346)):
            Circle(IZIM27_R)
    kes_ekstr_zyon13_tool3 = split(extrude(kes_ekstr_zyon13_sk3.sketch, amount=-KES_EKSTR_ZYON13_REACH, mode=Mode.PRIVATE), bisect_by=kes_ekstr_zyon13_end, keep=Keep.BOTH, mode=Mode.PRIVATE)
    # Çizim27 → Kes-Ekstrüzyon13 (cut, up to the picked face)
    with BuildSketch(Plane.ZY.offset(28), mode=Mode.PRIVATE) as kes_ekstr_zyon13_sk4:
        with Locations((25.531383581, 28.991384595)):
            Circle(IZIM27_R)
    kes_ekstr_zyon13_tool4 = split(extrude(kes_ekstr_zyon13_sk4.sketch, amount=-KES_EKSTR_ZYON13_REACH, mode=Mode.PRIVATE), bisect_by=kes_ekstr_zyon13_end, keep=Keep.BOTH, mode=Mode.PRIVATE)
    # Çizim27 → Kes-Ekstrüzyon13 (cut, up to the picked face)
    with BuildSketch(Plane.ZY.offset(28), mode=Mode.PRIVATE) as kes_ekstr_zyon13_sk5:
        with Locations((27.874529331, 34.648238845)):
            Circle(IZIM27_R)
    kes_ekstr_zyon13_tool5 = split(extrude(kes_ekstr_zyon13_sk5.sketch, amount=-KES_EKSTR_ZYON13_REACH, mode=Mode.PRIVATE), bisect_by=kes_ekstr_zyon13_end, keep=Keep.BOTH, mode=Mode.PRIVATE)
    add(kes_ekstr_zyon13_tool1.solids().sort_by(Axis((-28, 23.33453, 39.188238), (1, 0, 0)))[0], mode=Mode.SUBTRACT)
    add(kes_ekstr_zyon13_tool2.solids().sort_by(Axis((-28, 20.991385, 33.531384), (1, 0, 0)))[0], mode=Mode.SUBTRACT)
    add(kes_ekstr_zyon13_tool3.solids().sort_by(Axis((-28, 23.33453, 27.874529), (1, 0, 0)))[0], mode=Mode.SUBTRACT)
    add(kes_ekstr_zyon13_tool4.solids().sort_by(Axis((-28, 28.991385, 25.531384), (1, 0, 0)))[0], mode=Mode.SUBTRACT)
    add(kes_ekstr_zyon13_tool5.solids().sort_by(Axis((-28, 34.648239, 27.874529), (1, 0, 0)))[0], mode=Mode.SUBTRACT)


solid = part.part
